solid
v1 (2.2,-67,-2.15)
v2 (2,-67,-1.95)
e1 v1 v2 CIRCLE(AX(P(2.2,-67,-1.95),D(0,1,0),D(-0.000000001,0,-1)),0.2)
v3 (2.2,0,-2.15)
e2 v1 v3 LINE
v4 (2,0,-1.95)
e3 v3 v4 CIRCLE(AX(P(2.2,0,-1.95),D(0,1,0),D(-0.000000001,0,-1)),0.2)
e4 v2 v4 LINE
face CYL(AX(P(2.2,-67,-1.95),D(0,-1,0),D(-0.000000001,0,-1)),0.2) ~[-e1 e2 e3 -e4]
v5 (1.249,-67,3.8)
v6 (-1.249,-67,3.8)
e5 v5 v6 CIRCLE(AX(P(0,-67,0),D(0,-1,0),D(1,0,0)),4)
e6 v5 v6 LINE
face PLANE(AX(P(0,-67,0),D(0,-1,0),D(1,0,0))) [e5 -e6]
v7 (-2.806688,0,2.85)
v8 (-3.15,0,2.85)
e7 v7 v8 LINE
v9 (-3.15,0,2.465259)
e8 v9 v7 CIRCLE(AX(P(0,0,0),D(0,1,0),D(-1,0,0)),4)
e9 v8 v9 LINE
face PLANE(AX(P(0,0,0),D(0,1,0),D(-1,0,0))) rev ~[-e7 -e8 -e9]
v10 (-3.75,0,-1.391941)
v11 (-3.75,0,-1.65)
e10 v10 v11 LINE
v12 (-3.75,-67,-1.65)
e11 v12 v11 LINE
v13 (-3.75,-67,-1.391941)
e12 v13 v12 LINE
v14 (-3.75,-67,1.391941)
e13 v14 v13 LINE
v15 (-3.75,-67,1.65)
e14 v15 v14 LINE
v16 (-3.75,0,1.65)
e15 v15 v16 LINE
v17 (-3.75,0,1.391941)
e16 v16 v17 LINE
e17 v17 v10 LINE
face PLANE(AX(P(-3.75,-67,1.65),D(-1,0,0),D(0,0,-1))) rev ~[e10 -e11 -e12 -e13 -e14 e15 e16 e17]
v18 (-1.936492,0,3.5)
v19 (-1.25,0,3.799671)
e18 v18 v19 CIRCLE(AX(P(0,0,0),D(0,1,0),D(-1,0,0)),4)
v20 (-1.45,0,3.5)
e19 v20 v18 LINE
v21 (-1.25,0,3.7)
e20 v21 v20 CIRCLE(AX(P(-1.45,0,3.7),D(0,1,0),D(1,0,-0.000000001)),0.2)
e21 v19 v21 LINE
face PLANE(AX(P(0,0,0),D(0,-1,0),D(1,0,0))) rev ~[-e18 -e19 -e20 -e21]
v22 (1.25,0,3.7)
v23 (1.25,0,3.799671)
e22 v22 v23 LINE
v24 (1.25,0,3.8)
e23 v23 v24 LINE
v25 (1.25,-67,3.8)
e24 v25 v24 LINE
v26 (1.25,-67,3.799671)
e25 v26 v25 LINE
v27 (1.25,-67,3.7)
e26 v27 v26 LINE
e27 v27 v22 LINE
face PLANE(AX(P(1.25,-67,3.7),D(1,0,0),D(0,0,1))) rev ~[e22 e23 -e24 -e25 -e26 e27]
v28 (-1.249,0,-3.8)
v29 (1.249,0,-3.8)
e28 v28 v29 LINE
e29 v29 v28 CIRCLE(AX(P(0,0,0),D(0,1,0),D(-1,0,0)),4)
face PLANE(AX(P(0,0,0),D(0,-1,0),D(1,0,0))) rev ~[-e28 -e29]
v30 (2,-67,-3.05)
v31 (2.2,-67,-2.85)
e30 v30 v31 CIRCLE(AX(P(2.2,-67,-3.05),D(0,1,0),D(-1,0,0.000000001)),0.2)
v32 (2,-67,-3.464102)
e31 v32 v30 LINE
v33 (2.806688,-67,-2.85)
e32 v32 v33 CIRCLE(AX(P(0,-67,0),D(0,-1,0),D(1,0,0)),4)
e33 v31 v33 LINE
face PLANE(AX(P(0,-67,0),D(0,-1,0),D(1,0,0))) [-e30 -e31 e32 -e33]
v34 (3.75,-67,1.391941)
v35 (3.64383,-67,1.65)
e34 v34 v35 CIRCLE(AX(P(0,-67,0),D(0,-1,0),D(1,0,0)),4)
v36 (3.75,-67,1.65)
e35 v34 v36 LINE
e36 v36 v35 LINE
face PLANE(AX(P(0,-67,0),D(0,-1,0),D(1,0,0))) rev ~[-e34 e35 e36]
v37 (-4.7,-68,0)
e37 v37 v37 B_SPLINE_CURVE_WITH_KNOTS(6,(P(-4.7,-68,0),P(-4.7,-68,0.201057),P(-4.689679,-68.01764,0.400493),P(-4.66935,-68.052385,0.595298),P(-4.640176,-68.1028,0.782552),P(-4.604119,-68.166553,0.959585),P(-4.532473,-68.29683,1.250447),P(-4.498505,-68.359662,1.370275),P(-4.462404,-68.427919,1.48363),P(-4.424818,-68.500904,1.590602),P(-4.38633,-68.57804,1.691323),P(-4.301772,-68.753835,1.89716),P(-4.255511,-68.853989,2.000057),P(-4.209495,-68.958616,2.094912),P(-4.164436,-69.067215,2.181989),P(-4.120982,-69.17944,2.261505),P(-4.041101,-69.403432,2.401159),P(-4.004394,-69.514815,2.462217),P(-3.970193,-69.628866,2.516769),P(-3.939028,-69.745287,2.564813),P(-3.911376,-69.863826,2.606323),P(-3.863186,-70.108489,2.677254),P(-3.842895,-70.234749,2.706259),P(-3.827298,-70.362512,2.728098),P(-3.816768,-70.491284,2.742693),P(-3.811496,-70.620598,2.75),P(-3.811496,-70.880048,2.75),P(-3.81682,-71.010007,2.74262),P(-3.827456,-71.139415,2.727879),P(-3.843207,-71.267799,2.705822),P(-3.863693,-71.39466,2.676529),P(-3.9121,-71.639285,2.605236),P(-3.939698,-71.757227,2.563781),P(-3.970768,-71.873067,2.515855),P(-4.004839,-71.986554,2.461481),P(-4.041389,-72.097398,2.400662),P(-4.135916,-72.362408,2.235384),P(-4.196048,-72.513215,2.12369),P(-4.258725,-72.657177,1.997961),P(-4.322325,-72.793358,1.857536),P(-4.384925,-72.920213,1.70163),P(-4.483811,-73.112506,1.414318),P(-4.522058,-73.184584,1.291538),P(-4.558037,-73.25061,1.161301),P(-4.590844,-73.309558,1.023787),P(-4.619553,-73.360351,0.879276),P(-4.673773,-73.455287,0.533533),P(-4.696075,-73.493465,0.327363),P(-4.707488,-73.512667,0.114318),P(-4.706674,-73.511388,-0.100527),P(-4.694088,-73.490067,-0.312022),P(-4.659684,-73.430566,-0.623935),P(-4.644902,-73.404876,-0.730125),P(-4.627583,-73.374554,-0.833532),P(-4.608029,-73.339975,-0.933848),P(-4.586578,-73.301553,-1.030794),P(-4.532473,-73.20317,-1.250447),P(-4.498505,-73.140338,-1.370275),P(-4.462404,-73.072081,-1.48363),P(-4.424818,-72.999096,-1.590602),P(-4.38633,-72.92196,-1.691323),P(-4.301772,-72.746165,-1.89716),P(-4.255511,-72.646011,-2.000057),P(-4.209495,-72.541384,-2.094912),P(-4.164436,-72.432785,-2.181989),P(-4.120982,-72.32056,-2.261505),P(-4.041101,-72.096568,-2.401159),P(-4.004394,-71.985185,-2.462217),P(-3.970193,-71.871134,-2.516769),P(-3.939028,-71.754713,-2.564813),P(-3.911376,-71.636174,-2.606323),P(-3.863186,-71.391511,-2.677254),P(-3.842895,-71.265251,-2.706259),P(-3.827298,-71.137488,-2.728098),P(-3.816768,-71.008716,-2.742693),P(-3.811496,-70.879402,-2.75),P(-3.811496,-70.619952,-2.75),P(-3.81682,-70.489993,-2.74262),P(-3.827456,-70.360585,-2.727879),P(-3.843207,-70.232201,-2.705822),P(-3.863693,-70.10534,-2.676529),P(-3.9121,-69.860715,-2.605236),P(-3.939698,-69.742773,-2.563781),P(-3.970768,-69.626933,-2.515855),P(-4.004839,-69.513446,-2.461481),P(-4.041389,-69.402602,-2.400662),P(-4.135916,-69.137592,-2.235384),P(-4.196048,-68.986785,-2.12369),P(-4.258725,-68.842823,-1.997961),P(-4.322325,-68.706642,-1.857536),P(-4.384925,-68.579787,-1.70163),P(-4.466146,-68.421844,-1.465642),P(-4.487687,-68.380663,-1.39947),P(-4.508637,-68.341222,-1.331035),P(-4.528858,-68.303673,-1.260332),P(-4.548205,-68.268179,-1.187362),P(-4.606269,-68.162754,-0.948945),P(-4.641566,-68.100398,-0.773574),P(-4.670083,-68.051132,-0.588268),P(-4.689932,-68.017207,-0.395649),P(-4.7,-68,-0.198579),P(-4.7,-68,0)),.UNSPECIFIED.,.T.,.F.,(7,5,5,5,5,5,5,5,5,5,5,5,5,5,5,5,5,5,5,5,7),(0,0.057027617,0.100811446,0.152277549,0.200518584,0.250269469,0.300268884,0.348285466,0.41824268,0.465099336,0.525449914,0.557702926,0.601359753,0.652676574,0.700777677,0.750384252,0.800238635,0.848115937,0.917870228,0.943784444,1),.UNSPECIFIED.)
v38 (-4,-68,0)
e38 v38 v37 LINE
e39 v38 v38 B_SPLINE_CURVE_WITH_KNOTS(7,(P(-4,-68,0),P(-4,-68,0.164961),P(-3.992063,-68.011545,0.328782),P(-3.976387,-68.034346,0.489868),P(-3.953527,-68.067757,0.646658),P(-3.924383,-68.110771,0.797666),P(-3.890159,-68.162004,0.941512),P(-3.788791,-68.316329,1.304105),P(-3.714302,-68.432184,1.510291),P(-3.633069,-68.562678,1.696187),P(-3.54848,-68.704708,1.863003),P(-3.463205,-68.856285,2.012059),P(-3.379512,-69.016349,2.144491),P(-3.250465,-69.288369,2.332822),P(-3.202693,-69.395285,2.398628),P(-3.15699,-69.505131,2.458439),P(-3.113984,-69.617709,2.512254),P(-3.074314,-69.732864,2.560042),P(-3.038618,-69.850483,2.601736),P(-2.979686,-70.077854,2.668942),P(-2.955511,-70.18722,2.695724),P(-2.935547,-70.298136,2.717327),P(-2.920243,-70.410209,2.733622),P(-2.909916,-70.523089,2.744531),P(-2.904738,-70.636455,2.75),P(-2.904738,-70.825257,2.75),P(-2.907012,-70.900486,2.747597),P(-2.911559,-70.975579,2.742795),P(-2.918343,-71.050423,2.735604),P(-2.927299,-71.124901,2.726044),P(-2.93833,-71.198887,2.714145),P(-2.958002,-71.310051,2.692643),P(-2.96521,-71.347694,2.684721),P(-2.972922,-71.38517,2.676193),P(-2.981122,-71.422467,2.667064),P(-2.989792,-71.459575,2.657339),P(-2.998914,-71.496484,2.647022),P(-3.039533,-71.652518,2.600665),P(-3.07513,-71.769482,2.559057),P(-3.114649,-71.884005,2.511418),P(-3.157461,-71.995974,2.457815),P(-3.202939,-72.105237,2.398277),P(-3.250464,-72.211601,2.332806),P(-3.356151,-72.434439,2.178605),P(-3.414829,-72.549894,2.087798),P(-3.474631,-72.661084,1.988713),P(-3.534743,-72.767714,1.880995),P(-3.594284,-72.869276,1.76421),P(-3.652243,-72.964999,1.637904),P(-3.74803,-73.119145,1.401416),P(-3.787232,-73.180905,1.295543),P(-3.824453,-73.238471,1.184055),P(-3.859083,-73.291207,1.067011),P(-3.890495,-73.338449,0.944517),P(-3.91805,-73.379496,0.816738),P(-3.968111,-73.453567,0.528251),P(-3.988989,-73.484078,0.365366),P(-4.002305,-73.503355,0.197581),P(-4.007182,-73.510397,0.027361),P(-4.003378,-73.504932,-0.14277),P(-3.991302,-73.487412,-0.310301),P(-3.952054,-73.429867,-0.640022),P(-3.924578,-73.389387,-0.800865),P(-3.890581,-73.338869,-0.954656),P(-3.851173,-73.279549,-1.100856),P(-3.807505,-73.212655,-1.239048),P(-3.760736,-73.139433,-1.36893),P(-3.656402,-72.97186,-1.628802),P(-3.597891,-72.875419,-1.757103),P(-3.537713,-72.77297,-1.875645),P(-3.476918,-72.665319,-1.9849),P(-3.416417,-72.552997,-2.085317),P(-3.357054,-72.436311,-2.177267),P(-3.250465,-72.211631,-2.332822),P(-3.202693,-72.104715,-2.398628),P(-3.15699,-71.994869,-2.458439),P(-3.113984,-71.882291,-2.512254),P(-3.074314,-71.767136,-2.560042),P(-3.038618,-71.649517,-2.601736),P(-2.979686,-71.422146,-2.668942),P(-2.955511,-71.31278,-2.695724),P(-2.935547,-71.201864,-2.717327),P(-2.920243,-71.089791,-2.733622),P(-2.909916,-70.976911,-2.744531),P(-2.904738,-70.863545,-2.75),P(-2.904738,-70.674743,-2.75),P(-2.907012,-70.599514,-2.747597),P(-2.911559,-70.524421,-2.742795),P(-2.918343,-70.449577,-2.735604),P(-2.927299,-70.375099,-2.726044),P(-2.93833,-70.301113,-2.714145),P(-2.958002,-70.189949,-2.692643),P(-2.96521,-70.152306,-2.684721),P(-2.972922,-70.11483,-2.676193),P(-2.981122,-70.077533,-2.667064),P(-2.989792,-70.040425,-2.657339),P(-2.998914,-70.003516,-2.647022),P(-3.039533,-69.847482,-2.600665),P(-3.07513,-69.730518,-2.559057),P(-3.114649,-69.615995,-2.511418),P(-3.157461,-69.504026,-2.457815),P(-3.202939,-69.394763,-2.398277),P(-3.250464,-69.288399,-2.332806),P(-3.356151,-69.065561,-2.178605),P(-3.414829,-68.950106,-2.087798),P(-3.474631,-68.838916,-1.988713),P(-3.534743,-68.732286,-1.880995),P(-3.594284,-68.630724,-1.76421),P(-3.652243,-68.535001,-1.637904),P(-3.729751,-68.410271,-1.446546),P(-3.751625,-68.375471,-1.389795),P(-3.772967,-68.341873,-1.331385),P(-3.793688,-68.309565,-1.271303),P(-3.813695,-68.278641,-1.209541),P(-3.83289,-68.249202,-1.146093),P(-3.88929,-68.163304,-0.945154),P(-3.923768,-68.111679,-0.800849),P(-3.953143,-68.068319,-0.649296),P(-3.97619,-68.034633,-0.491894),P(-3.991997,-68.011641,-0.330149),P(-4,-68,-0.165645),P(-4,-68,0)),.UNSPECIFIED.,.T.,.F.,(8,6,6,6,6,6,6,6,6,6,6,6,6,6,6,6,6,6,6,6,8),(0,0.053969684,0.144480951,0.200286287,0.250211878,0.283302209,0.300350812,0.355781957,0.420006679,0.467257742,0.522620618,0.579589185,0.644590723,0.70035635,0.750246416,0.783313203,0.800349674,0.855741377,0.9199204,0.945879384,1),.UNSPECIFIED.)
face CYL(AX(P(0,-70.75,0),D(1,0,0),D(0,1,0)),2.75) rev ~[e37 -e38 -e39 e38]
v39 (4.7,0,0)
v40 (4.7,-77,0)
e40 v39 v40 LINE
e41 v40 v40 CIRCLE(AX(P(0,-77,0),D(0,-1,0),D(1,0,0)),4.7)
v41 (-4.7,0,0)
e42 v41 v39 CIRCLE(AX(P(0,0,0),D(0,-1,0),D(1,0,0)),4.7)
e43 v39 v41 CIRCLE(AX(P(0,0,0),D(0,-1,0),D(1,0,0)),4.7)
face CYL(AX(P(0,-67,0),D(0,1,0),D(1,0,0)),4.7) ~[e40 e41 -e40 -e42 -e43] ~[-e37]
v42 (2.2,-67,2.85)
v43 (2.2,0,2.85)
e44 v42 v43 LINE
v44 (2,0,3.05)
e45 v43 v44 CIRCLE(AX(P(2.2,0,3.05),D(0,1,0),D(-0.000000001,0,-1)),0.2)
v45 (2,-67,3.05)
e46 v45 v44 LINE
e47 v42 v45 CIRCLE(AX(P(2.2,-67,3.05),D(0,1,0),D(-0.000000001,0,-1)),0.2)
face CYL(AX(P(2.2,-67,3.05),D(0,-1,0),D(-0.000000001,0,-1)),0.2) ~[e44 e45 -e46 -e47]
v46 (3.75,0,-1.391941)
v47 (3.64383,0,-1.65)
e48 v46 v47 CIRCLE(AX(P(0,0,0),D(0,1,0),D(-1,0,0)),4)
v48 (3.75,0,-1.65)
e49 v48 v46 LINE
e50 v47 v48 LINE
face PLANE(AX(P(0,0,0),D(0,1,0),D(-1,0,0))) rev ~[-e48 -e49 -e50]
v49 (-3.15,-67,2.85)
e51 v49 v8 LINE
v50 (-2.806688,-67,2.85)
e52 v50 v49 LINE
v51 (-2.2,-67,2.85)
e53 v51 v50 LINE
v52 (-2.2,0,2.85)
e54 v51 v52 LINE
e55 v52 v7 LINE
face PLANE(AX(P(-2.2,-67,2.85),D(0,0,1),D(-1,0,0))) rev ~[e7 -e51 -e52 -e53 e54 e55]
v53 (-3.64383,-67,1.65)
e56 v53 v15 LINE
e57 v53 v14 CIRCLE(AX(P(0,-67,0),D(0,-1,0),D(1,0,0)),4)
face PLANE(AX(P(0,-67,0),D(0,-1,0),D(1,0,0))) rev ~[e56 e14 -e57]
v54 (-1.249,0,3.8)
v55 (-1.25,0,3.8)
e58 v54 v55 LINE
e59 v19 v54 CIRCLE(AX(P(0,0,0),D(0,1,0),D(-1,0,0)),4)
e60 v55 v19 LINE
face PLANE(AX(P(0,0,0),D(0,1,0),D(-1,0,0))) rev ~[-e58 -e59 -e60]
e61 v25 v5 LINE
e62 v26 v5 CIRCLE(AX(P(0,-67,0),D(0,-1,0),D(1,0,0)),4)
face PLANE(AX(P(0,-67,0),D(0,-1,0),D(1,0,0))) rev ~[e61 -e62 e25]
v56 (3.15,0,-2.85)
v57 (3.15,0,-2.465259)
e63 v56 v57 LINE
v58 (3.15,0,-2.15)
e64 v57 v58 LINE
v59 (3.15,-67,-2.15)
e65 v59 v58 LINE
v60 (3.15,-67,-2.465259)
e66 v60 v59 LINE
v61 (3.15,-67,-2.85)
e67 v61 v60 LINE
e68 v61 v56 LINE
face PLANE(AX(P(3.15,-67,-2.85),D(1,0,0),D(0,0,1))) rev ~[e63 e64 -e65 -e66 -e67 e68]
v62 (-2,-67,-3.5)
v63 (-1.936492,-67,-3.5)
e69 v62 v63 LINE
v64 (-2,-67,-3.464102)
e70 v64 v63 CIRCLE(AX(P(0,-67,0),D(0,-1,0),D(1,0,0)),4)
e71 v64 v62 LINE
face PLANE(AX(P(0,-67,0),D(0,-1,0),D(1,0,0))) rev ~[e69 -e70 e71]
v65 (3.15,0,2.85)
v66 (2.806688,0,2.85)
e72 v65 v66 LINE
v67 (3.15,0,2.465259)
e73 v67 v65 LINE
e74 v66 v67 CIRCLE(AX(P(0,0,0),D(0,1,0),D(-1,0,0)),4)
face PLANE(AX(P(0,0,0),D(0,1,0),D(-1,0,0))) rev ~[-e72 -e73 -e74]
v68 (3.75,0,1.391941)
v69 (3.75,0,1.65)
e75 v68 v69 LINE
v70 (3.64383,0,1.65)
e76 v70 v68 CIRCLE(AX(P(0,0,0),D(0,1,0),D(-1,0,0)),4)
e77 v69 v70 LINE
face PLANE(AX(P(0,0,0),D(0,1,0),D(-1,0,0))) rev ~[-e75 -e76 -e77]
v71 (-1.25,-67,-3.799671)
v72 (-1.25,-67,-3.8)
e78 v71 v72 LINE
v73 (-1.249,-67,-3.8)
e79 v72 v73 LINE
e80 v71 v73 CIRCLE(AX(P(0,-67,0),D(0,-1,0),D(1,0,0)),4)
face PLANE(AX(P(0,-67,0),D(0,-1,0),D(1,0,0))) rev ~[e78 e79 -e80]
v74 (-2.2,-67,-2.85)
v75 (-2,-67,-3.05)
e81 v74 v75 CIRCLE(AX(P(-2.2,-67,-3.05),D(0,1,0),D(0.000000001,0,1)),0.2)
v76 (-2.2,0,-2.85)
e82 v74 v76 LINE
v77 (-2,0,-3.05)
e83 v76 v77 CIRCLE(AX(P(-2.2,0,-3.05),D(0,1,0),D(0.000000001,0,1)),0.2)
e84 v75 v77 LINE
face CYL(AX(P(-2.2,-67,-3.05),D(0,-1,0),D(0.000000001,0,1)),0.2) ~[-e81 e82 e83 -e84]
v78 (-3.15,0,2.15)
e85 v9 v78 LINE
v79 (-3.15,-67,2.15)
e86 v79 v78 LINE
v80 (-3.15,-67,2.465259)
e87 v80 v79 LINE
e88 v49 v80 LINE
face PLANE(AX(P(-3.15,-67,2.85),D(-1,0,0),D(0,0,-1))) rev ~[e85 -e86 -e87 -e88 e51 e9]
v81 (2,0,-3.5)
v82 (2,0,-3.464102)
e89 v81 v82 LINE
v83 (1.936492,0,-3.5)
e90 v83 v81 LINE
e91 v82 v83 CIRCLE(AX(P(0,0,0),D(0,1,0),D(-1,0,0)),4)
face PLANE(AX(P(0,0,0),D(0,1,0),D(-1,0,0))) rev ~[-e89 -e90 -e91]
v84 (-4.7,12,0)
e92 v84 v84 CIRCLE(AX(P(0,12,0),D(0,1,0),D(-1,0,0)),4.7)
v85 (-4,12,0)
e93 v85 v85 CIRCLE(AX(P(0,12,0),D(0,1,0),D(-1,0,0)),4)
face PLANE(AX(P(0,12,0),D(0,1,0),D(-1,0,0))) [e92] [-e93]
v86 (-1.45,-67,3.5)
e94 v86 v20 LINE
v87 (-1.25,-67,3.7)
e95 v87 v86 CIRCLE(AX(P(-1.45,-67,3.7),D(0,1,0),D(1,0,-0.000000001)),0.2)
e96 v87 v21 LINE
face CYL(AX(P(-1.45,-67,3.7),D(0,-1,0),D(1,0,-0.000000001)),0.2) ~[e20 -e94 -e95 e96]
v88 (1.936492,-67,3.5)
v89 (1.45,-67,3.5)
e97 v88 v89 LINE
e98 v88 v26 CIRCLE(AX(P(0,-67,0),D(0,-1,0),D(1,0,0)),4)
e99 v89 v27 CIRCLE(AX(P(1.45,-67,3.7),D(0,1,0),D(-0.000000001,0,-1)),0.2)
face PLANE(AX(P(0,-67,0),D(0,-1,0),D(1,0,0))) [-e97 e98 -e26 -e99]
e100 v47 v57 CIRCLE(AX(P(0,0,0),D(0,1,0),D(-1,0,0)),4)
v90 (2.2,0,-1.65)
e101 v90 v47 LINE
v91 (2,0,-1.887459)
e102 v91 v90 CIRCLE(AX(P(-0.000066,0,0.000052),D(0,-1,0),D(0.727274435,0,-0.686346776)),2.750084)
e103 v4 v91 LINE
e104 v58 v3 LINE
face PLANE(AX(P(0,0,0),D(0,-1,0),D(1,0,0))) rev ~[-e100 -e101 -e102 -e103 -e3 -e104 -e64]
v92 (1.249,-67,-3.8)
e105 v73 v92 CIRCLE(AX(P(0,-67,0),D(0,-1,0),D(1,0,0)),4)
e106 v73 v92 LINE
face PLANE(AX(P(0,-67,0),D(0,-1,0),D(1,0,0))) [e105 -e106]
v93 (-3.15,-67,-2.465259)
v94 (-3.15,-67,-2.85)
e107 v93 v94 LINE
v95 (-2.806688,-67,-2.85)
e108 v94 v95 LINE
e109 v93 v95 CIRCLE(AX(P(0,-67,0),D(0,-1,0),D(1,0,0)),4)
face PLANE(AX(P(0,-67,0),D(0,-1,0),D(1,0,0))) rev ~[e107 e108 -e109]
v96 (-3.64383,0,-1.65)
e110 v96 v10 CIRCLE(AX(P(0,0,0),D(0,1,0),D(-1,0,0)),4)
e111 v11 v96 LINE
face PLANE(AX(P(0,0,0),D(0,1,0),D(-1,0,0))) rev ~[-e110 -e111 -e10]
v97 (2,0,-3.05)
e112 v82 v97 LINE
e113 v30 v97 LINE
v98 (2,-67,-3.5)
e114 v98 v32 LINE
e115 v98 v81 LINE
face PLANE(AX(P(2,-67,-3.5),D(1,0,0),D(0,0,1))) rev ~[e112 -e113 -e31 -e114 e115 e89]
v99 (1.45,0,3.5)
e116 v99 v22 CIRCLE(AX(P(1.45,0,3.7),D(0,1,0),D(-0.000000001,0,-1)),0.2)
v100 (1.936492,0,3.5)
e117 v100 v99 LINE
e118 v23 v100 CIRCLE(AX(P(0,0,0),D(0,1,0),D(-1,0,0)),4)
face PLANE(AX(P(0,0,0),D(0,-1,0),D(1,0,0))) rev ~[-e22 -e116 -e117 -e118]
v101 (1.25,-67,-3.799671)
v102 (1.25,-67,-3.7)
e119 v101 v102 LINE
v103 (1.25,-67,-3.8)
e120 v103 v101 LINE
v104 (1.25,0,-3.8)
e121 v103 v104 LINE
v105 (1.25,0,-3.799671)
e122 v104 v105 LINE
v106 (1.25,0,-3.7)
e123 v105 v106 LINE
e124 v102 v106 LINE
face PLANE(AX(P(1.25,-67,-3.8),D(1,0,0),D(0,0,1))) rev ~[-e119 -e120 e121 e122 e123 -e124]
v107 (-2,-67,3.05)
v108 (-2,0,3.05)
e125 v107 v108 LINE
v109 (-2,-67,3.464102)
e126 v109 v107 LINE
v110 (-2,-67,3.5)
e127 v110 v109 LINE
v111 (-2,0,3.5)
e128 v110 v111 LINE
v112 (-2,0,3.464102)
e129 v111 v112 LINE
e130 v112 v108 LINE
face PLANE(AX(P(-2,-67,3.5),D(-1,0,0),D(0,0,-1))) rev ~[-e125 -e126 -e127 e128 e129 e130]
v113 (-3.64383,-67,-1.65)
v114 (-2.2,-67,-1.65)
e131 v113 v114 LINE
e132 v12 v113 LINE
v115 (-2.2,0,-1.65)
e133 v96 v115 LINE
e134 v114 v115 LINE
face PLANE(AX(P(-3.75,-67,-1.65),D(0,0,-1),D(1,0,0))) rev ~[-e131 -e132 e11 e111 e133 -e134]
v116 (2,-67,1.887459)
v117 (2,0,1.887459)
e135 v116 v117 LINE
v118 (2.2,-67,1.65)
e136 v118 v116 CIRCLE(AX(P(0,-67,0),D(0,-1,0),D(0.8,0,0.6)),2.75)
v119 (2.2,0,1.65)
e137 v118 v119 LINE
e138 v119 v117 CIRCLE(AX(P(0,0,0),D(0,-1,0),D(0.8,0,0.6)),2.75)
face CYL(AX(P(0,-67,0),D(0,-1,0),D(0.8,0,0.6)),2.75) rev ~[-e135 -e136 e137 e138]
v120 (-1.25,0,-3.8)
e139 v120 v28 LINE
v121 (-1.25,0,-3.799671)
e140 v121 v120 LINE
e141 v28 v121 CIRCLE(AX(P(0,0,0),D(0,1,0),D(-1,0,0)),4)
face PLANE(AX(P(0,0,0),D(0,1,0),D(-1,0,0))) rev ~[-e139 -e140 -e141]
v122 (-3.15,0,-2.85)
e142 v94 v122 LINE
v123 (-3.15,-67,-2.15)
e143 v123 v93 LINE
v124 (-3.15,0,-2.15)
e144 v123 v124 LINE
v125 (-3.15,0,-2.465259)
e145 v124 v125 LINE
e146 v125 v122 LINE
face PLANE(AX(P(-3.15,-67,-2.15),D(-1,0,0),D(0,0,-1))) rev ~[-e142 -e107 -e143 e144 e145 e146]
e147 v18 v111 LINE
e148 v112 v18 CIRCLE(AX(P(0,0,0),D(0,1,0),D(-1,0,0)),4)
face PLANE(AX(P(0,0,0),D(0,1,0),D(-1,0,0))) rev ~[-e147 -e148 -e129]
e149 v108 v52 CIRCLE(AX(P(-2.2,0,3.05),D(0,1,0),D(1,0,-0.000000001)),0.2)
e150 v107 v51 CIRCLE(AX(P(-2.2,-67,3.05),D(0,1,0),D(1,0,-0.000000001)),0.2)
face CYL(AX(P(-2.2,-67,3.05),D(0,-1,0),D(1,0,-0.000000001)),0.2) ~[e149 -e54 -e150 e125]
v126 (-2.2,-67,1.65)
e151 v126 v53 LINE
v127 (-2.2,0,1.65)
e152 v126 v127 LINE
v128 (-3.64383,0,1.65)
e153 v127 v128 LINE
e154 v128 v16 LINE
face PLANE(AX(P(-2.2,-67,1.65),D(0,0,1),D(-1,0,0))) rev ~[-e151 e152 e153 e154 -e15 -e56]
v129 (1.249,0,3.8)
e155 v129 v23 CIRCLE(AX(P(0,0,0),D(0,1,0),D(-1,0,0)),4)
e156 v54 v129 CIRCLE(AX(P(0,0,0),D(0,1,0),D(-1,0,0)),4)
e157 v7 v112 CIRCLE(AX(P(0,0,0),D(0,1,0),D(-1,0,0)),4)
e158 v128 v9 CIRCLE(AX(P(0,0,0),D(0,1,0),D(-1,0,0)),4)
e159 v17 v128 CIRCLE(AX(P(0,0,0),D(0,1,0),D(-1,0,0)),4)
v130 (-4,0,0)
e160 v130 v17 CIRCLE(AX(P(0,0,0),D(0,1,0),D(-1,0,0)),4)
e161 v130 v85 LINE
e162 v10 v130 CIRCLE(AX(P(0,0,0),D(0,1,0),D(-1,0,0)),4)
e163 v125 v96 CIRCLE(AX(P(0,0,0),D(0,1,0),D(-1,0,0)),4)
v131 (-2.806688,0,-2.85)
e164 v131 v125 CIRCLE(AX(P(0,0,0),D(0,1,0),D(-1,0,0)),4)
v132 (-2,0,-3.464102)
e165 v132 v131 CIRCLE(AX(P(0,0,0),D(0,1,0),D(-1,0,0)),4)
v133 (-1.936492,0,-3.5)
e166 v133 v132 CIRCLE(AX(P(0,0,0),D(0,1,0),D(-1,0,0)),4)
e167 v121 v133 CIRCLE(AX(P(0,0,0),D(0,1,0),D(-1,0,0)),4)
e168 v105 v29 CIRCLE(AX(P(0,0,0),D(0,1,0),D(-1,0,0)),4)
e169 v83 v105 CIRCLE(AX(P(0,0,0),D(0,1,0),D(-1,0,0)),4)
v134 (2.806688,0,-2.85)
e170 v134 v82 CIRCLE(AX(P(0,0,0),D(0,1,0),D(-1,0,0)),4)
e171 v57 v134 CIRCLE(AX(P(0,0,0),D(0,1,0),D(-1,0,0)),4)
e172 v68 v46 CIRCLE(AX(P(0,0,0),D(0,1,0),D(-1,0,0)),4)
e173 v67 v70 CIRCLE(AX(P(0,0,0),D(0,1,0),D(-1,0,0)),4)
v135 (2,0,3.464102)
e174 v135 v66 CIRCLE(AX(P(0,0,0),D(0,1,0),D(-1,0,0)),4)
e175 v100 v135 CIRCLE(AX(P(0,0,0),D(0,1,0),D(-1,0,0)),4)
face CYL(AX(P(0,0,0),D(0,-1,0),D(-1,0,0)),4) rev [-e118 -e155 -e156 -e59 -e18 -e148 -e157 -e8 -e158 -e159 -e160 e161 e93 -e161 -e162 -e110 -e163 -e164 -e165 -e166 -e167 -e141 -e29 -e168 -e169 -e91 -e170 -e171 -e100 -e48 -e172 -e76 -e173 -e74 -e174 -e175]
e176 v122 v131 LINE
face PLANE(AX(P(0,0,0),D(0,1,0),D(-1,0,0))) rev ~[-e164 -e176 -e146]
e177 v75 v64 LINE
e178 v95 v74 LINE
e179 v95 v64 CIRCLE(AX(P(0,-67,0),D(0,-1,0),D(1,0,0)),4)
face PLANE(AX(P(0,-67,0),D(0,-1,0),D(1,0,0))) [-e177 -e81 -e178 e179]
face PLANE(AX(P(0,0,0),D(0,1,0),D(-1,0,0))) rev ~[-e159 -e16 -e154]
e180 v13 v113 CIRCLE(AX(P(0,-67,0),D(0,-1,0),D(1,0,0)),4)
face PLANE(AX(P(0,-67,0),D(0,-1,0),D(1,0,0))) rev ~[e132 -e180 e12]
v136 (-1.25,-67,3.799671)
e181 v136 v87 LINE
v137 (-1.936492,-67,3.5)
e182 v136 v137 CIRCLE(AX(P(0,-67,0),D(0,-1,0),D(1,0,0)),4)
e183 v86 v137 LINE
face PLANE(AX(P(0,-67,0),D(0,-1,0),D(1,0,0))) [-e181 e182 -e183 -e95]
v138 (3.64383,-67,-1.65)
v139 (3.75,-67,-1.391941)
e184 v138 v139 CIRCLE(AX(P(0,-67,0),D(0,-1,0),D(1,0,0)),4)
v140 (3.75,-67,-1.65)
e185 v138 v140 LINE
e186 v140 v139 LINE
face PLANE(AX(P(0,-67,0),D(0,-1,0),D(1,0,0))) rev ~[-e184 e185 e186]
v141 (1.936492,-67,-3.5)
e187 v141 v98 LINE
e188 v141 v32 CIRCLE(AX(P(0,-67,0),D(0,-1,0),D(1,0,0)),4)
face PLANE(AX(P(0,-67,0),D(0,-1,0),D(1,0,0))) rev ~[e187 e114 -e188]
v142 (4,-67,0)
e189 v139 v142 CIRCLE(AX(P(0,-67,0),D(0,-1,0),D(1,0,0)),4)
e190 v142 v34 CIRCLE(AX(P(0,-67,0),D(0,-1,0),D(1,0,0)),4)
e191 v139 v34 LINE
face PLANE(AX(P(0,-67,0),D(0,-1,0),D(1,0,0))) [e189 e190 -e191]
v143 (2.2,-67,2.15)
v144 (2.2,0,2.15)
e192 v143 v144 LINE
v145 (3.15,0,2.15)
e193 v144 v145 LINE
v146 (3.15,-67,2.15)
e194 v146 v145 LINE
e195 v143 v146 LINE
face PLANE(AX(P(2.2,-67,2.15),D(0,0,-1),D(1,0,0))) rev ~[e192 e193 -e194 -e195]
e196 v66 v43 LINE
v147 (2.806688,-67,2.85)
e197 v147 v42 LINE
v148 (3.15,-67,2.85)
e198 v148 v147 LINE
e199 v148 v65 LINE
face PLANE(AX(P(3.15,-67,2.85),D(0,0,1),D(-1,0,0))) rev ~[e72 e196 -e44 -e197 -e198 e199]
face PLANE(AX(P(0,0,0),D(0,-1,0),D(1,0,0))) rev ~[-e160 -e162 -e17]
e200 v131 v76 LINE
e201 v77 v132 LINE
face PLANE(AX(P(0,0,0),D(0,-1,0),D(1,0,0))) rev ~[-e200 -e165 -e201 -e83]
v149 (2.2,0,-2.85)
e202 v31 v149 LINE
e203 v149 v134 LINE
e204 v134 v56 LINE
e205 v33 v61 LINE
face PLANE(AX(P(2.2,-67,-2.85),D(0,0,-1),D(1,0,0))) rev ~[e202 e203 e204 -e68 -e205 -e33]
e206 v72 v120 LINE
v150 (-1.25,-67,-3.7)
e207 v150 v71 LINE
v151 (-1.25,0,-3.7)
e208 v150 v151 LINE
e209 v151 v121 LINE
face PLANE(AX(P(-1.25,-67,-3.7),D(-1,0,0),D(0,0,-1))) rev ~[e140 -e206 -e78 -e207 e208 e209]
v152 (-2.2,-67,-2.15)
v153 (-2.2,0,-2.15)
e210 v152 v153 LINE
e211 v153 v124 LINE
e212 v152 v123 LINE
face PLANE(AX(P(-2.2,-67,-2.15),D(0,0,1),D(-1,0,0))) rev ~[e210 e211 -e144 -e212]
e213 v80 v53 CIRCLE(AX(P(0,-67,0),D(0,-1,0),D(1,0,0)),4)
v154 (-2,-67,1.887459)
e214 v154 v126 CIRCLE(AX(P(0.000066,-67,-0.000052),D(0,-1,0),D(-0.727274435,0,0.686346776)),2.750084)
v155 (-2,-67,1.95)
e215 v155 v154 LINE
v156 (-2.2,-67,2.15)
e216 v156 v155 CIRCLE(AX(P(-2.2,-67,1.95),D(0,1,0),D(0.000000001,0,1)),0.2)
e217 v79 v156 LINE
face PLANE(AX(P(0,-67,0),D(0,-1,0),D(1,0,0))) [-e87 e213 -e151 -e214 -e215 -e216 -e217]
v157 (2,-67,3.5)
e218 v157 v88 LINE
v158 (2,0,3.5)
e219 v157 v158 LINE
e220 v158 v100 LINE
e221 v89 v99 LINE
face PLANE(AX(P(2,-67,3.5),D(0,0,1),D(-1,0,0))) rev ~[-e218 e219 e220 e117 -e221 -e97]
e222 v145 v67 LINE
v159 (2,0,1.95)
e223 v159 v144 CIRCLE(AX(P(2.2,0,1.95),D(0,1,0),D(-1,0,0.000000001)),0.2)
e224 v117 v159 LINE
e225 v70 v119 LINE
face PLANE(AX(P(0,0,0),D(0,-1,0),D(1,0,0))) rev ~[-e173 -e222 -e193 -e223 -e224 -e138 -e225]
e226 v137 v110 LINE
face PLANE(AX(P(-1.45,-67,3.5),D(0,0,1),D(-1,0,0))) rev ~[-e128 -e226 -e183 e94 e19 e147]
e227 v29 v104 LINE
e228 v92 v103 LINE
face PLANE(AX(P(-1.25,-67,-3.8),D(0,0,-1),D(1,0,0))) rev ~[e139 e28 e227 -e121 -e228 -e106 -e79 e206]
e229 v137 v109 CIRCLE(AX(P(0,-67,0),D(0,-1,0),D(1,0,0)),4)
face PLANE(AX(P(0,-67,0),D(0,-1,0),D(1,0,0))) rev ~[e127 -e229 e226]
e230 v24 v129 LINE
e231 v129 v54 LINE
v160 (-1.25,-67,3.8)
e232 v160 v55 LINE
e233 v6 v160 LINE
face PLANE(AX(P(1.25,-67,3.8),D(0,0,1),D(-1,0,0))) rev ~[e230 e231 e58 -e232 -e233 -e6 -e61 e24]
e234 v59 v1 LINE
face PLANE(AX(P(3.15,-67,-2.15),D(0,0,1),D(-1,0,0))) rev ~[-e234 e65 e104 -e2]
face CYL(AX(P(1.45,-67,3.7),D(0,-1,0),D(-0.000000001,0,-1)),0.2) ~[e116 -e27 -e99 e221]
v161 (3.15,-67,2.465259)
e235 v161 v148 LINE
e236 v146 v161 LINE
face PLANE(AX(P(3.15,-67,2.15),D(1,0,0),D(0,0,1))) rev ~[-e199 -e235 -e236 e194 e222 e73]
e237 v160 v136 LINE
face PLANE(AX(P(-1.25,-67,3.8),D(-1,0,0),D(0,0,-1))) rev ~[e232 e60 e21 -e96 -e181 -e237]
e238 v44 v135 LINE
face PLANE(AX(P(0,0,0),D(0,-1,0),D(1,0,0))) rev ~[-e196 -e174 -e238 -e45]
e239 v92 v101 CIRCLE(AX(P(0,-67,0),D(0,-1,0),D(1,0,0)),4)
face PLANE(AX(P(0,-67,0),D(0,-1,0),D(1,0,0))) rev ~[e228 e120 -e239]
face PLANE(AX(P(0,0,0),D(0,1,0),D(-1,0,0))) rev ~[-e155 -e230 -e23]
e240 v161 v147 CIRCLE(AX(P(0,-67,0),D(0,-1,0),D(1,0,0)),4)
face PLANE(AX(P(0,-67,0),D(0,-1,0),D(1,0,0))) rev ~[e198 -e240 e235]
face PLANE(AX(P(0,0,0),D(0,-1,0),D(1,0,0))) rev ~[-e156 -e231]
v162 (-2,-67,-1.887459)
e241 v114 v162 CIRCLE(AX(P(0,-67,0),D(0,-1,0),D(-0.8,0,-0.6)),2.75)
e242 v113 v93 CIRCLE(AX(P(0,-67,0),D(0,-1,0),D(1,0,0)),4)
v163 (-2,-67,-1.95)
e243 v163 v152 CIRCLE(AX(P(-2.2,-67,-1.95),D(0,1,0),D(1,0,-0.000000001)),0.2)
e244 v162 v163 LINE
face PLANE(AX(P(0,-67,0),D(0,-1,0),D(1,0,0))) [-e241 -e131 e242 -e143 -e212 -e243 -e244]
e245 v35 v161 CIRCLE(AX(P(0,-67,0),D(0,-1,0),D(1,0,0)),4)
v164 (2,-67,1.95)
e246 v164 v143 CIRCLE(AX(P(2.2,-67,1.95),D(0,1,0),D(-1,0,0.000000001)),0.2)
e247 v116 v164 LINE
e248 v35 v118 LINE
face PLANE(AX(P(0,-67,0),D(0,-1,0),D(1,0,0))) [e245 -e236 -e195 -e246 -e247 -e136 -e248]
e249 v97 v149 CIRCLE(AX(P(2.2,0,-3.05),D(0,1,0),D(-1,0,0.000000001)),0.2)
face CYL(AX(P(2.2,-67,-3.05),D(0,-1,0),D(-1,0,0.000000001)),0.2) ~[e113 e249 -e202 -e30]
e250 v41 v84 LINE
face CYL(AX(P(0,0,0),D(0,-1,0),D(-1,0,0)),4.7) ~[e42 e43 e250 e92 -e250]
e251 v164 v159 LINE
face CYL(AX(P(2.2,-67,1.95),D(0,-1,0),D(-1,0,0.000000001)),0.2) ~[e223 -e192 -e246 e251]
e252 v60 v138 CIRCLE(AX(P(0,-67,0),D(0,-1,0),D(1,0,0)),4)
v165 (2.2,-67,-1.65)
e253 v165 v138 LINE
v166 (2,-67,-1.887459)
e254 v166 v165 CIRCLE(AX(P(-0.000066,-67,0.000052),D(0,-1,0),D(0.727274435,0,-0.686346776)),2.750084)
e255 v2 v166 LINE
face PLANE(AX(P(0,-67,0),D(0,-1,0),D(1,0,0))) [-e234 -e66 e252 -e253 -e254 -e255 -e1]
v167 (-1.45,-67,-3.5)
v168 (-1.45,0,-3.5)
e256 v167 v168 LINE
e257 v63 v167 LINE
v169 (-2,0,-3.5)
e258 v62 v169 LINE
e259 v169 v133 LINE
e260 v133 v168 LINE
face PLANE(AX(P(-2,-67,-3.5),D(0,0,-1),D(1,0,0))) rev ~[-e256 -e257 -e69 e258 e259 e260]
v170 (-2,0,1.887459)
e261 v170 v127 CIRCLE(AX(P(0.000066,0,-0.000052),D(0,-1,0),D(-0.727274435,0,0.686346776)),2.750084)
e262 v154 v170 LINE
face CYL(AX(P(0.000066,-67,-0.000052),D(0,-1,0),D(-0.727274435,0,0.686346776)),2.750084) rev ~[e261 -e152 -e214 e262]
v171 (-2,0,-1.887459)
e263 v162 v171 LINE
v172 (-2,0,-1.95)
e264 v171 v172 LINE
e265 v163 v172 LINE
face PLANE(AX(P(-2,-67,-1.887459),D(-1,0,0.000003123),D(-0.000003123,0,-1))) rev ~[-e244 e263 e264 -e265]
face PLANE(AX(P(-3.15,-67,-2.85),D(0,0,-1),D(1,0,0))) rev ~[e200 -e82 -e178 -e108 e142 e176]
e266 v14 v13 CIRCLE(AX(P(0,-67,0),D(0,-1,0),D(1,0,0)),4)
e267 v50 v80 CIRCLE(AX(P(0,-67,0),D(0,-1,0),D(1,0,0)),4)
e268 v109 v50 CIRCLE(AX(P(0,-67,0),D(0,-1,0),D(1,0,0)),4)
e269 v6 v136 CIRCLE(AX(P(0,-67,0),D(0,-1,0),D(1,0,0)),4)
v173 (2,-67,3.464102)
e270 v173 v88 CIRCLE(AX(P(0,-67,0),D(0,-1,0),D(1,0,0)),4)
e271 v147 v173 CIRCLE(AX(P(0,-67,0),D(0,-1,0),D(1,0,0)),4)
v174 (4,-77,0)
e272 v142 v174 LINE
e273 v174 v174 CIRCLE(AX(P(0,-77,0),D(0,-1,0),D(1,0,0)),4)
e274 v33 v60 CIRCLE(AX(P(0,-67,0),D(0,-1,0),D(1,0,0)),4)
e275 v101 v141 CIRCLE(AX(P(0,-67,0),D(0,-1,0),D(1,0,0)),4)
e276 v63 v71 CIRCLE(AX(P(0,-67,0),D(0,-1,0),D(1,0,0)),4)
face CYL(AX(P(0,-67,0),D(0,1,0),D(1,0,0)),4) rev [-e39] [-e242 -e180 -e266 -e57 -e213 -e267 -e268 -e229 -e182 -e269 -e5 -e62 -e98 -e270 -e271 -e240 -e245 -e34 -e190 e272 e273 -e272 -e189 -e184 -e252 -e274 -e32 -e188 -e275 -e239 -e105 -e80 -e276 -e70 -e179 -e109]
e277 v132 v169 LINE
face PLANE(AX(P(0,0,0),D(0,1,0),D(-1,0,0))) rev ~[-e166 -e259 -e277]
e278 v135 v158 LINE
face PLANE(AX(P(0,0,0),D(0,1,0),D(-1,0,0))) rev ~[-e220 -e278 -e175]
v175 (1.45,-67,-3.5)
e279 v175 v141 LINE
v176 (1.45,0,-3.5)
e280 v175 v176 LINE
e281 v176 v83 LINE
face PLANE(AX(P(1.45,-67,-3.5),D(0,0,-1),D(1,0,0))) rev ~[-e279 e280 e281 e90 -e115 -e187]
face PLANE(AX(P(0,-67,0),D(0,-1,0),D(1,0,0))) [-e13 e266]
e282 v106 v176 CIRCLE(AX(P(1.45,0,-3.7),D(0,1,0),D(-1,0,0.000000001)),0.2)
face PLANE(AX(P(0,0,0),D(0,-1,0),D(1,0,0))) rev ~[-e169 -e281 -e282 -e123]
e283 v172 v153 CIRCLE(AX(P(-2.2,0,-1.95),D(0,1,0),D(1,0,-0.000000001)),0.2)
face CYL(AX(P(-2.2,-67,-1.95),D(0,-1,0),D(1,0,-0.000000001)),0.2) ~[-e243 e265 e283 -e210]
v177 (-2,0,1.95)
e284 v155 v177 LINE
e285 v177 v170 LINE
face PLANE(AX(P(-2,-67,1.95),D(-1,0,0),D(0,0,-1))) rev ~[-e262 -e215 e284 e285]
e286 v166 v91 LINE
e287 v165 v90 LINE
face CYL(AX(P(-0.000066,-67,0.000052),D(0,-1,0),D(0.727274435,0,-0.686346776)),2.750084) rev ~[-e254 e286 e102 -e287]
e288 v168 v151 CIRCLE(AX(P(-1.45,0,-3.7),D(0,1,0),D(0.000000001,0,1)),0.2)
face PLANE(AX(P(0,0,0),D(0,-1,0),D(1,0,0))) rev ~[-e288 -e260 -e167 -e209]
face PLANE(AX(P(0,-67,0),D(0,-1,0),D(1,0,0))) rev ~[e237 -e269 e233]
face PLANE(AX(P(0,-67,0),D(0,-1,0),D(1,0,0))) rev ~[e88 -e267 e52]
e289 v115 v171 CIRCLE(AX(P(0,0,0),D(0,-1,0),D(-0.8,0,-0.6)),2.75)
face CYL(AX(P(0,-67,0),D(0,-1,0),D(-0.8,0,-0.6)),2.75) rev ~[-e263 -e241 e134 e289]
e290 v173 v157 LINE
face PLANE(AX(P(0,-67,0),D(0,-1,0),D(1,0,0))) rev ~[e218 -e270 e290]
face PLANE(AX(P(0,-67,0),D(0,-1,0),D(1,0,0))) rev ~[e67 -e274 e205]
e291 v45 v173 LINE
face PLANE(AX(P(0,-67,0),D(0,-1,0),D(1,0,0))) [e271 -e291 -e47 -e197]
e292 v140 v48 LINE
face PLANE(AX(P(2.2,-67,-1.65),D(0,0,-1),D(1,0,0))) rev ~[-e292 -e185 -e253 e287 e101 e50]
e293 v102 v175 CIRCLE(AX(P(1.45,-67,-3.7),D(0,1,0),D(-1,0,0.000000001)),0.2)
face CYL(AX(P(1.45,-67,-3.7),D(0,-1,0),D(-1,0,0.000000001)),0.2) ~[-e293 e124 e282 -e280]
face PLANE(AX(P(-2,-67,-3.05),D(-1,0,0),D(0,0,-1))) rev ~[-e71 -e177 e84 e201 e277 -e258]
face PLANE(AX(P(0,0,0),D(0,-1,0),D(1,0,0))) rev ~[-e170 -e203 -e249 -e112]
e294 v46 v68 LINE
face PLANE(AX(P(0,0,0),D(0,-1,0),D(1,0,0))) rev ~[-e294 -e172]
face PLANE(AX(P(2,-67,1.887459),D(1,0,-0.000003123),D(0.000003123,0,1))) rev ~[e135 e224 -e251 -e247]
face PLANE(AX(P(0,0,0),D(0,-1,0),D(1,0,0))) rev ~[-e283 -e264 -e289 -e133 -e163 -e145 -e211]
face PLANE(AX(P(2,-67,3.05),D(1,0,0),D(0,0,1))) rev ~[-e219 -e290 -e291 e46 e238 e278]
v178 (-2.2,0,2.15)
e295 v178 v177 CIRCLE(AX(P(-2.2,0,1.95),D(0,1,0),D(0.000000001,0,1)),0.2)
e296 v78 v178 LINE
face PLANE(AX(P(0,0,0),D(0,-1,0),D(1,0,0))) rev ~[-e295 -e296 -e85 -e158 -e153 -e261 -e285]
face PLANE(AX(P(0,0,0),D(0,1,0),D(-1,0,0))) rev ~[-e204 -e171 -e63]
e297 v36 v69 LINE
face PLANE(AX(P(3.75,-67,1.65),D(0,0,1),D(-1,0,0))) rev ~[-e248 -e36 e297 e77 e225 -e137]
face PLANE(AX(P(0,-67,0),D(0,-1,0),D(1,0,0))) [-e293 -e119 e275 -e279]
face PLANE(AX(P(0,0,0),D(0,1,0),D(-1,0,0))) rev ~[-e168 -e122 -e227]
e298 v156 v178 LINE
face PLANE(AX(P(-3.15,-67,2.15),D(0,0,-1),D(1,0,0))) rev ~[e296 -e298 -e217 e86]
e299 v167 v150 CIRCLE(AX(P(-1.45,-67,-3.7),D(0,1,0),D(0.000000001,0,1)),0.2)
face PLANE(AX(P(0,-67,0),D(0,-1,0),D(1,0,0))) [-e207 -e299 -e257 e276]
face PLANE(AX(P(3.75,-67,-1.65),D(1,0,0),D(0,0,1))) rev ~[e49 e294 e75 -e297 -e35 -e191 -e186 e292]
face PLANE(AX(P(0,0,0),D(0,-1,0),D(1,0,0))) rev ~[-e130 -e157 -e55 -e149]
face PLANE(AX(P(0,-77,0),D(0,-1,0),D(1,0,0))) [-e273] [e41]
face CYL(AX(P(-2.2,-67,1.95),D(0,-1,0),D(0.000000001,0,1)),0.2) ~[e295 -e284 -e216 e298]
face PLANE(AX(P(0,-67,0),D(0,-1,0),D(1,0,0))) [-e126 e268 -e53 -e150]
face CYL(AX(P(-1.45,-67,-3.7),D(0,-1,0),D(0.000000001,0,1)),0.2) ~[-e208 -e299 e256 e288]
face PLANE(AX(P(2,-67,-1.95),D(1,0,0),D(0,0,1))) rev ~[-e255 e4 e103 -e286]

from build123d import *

# Parameters (mm, degrees)
F3_R      = 4.7
F4_DEPTH  = 67
F8_DEPTH  = 67
F6_R      = 4.7
F6_R_2    = 4
F9_DEPTH  = 10
F7_R      = 4.7
F7_R_2    = 4
F10_DEPTH = 12
F11_R     = 2.75
F12_DEPTH = 4.701


# Not quite as in the source:
# - ends of sketch curves that miss each other by under 0.0002 mm in the source are joined


with BuildPart() as f4:
    # F3 (on Front) → F4 (new body)
    with BuildSketch(Plane.XZ):
        Circle(F3_R)
    extrude(amount=F4_DEPTH)

    # F5 (on face) → F8 (cut, through all)
    with BuildSketch(Plane.XZ.offset(67)):
        with BuildLine():
            Line((-1.25, -3.8), (0, -3.8))
            Line((0, -3.8), (1.25, -3.8))
            Line((1.25, -3.8), (1.25, -3.7))
            ThreePointArc((1.25, -3.7), (1.3085786438, -3.5585786438), (1.45, -3.5))
            Line((1.45, -3.5), (2, -3.5))
            Line((2, -3.5), (2, -3.05))
            ThreePointArc((2, -3.05), (2.0585786438, -2.9085786438), (2.2, -2.85))
            Line((2.2, -2.85), (3.15, -2.85))
            Line((3.15, -2.85), (3.15, -2.15))
            Line((3.15, -2.15), (2.2, -2.15))
            ThreePointArc((2.2, -2.15), (2.0585786438, -2.0914213562), (2, -1.95))
            Line((2, -1.95), (2, -1.887459))
            ThreePointArc((2, -1.887459), (2.1033535752, -1.771554046), (2.2, -1.65))
            Line((2.2, -1.65), (3.75, -1.65))
            Line((3.75, -1.65), (3.75, 0))
            Line((3.75, 0), (3.75, 1.65))
            Line((3.75, 1.65), (2.2, 1.65))
            ThreePointArc((2.2, 1.65), (2.1033535752, 1.771554046), (1.9999998047, 1.8874588157))
            Line((1.9999998047, 1.8874588157), (2, 1.95))
            ThreePointArc((2, 1.95), (2.0585786438, 2.0914213562), (2.2, 2.15))
            Line((2.2, 2.15), (3.15, 2.15))
            Line((3.15, 2.15), (3.15, 2.85))
            Line((3.15, 2.85), (2.2, 2.85))
            ThreePointArc((2.2, 2.85), (2.0585786438, 2.9085786438), (2, 3.05))
            Line((2, 3.05), (2, 3.5))
            Line((2, 3.5), (1.45, 3.5))
            ThreePointArc((1.45, 3.5), (1.3085786438, 3.5585786438), (1.25, 3.7))
            Line((1.25, 3.7), (1.25, 3.8))
            Line((1.25, 3.8), (0, 3.8))
            Line((0, 3.8), (-1.25, 3.8))
            Line((-1.25, 3.8), (-1.25, 3.7))
            ThreePointArc((-1.25, 3.7), (-1.3085786438, 3.5585786438), (-1.45, 3.5))
            Line((-1.45, 3.5), (-2, 3.5))
            Line((-2, 3.5), (-2, 3.05))
            ThreePointArc((-2, 3.05), (-2.0585786438, 2.9085786438), (-2.2, 2.85))
            Line((-2.2, 2.85), (-3.15, 2.85))
            Line((-3.15, 2.85), (-3.15, 2.15))
            Line((-3.15, 2.15), (-2.2, 2.15))
            ThreePointArc((-2.2, 2.15), (-2.0585786438, 2.0914213562), (-2, 1.95))
            Line((-2, 1.95), (-2, 1.887459))
            ThreePointArc((-2, 1.887459), (-2.1033535752, 1.771554046), (-2.2, 1.65))
            Line((-2.2, 1.65), (-3.75, 1.65))
            Line((-3.75, 1.65), (-3.75, 0))
            Line((-3.75, 0), (-3.75, -1.65))
            Line((-3.75, -1.65), (-2.2, -1.65))
            ThreePointArc((-2.2, -1.65), (-2.1033535752, -1.771554046), (-1.9999998047, -1.8874588157))
            Line((-1.9999998047, -1.8874588157), (-2, -1.95))
            ThreePointArc((-2, -1.95), (-2.0585786438, -2.0914213562), (-2.2, -2.15))
            Line((-2.2, -2.15), (-3.15, -2.15))
            Line((-3.15, -2.15), (-3.15, -2.85))
            Line((-3.15, -2.85), (-2.2, -2.85))
            ThreePointArc((-2.2, -2.85), (-2.0585786438, -2.9085786438), (-2, -3.05))
            Line((-2, -3.05), (-2, -3.5))
            Line((-2, -3.5), (-1.45, -3.5))
            ThreePointArc((-1.45, -3.5), (-1.3085786438, -3.5585786438), (-1.25, -3.7))
            Line((-1.25, -3.7), (-1.25, -3.8))
        make_face()
    extrude(amount=-F8_DEPTH, mode=Mode.SUBTRACT)

    # F6 (on face) → F9 (join)
    with BuildSketch(Plane.XZ.offset(67)):
        Circle(F6_R)
        Circle(F6_R_2, mode=Mode.SUBTRACT)
    extrude(amount=F9_DEPTH)

    # F7 (on face) → F10 (join)
    with BuildSketch(Plane(origin=(0, 0, 0), x_dir=(-1, 0, 0), z_dir=(0, 1, 0))):
        Circle(F7_R)
        Circle(F7_R_2, mode=Mode.SUBTRACT)
    extrude(amount=F10_DEPTH)

    # F11 (on Right) → F12 (cut, through all)
    with BuildSketch(Plane.YZ):
        with Locations((-70.75, 0)):
            Circle(F11_R)
    extrude(amount=-F12_DEPTH, mode=Mode.SUBTRACT)


solid = f4.part
